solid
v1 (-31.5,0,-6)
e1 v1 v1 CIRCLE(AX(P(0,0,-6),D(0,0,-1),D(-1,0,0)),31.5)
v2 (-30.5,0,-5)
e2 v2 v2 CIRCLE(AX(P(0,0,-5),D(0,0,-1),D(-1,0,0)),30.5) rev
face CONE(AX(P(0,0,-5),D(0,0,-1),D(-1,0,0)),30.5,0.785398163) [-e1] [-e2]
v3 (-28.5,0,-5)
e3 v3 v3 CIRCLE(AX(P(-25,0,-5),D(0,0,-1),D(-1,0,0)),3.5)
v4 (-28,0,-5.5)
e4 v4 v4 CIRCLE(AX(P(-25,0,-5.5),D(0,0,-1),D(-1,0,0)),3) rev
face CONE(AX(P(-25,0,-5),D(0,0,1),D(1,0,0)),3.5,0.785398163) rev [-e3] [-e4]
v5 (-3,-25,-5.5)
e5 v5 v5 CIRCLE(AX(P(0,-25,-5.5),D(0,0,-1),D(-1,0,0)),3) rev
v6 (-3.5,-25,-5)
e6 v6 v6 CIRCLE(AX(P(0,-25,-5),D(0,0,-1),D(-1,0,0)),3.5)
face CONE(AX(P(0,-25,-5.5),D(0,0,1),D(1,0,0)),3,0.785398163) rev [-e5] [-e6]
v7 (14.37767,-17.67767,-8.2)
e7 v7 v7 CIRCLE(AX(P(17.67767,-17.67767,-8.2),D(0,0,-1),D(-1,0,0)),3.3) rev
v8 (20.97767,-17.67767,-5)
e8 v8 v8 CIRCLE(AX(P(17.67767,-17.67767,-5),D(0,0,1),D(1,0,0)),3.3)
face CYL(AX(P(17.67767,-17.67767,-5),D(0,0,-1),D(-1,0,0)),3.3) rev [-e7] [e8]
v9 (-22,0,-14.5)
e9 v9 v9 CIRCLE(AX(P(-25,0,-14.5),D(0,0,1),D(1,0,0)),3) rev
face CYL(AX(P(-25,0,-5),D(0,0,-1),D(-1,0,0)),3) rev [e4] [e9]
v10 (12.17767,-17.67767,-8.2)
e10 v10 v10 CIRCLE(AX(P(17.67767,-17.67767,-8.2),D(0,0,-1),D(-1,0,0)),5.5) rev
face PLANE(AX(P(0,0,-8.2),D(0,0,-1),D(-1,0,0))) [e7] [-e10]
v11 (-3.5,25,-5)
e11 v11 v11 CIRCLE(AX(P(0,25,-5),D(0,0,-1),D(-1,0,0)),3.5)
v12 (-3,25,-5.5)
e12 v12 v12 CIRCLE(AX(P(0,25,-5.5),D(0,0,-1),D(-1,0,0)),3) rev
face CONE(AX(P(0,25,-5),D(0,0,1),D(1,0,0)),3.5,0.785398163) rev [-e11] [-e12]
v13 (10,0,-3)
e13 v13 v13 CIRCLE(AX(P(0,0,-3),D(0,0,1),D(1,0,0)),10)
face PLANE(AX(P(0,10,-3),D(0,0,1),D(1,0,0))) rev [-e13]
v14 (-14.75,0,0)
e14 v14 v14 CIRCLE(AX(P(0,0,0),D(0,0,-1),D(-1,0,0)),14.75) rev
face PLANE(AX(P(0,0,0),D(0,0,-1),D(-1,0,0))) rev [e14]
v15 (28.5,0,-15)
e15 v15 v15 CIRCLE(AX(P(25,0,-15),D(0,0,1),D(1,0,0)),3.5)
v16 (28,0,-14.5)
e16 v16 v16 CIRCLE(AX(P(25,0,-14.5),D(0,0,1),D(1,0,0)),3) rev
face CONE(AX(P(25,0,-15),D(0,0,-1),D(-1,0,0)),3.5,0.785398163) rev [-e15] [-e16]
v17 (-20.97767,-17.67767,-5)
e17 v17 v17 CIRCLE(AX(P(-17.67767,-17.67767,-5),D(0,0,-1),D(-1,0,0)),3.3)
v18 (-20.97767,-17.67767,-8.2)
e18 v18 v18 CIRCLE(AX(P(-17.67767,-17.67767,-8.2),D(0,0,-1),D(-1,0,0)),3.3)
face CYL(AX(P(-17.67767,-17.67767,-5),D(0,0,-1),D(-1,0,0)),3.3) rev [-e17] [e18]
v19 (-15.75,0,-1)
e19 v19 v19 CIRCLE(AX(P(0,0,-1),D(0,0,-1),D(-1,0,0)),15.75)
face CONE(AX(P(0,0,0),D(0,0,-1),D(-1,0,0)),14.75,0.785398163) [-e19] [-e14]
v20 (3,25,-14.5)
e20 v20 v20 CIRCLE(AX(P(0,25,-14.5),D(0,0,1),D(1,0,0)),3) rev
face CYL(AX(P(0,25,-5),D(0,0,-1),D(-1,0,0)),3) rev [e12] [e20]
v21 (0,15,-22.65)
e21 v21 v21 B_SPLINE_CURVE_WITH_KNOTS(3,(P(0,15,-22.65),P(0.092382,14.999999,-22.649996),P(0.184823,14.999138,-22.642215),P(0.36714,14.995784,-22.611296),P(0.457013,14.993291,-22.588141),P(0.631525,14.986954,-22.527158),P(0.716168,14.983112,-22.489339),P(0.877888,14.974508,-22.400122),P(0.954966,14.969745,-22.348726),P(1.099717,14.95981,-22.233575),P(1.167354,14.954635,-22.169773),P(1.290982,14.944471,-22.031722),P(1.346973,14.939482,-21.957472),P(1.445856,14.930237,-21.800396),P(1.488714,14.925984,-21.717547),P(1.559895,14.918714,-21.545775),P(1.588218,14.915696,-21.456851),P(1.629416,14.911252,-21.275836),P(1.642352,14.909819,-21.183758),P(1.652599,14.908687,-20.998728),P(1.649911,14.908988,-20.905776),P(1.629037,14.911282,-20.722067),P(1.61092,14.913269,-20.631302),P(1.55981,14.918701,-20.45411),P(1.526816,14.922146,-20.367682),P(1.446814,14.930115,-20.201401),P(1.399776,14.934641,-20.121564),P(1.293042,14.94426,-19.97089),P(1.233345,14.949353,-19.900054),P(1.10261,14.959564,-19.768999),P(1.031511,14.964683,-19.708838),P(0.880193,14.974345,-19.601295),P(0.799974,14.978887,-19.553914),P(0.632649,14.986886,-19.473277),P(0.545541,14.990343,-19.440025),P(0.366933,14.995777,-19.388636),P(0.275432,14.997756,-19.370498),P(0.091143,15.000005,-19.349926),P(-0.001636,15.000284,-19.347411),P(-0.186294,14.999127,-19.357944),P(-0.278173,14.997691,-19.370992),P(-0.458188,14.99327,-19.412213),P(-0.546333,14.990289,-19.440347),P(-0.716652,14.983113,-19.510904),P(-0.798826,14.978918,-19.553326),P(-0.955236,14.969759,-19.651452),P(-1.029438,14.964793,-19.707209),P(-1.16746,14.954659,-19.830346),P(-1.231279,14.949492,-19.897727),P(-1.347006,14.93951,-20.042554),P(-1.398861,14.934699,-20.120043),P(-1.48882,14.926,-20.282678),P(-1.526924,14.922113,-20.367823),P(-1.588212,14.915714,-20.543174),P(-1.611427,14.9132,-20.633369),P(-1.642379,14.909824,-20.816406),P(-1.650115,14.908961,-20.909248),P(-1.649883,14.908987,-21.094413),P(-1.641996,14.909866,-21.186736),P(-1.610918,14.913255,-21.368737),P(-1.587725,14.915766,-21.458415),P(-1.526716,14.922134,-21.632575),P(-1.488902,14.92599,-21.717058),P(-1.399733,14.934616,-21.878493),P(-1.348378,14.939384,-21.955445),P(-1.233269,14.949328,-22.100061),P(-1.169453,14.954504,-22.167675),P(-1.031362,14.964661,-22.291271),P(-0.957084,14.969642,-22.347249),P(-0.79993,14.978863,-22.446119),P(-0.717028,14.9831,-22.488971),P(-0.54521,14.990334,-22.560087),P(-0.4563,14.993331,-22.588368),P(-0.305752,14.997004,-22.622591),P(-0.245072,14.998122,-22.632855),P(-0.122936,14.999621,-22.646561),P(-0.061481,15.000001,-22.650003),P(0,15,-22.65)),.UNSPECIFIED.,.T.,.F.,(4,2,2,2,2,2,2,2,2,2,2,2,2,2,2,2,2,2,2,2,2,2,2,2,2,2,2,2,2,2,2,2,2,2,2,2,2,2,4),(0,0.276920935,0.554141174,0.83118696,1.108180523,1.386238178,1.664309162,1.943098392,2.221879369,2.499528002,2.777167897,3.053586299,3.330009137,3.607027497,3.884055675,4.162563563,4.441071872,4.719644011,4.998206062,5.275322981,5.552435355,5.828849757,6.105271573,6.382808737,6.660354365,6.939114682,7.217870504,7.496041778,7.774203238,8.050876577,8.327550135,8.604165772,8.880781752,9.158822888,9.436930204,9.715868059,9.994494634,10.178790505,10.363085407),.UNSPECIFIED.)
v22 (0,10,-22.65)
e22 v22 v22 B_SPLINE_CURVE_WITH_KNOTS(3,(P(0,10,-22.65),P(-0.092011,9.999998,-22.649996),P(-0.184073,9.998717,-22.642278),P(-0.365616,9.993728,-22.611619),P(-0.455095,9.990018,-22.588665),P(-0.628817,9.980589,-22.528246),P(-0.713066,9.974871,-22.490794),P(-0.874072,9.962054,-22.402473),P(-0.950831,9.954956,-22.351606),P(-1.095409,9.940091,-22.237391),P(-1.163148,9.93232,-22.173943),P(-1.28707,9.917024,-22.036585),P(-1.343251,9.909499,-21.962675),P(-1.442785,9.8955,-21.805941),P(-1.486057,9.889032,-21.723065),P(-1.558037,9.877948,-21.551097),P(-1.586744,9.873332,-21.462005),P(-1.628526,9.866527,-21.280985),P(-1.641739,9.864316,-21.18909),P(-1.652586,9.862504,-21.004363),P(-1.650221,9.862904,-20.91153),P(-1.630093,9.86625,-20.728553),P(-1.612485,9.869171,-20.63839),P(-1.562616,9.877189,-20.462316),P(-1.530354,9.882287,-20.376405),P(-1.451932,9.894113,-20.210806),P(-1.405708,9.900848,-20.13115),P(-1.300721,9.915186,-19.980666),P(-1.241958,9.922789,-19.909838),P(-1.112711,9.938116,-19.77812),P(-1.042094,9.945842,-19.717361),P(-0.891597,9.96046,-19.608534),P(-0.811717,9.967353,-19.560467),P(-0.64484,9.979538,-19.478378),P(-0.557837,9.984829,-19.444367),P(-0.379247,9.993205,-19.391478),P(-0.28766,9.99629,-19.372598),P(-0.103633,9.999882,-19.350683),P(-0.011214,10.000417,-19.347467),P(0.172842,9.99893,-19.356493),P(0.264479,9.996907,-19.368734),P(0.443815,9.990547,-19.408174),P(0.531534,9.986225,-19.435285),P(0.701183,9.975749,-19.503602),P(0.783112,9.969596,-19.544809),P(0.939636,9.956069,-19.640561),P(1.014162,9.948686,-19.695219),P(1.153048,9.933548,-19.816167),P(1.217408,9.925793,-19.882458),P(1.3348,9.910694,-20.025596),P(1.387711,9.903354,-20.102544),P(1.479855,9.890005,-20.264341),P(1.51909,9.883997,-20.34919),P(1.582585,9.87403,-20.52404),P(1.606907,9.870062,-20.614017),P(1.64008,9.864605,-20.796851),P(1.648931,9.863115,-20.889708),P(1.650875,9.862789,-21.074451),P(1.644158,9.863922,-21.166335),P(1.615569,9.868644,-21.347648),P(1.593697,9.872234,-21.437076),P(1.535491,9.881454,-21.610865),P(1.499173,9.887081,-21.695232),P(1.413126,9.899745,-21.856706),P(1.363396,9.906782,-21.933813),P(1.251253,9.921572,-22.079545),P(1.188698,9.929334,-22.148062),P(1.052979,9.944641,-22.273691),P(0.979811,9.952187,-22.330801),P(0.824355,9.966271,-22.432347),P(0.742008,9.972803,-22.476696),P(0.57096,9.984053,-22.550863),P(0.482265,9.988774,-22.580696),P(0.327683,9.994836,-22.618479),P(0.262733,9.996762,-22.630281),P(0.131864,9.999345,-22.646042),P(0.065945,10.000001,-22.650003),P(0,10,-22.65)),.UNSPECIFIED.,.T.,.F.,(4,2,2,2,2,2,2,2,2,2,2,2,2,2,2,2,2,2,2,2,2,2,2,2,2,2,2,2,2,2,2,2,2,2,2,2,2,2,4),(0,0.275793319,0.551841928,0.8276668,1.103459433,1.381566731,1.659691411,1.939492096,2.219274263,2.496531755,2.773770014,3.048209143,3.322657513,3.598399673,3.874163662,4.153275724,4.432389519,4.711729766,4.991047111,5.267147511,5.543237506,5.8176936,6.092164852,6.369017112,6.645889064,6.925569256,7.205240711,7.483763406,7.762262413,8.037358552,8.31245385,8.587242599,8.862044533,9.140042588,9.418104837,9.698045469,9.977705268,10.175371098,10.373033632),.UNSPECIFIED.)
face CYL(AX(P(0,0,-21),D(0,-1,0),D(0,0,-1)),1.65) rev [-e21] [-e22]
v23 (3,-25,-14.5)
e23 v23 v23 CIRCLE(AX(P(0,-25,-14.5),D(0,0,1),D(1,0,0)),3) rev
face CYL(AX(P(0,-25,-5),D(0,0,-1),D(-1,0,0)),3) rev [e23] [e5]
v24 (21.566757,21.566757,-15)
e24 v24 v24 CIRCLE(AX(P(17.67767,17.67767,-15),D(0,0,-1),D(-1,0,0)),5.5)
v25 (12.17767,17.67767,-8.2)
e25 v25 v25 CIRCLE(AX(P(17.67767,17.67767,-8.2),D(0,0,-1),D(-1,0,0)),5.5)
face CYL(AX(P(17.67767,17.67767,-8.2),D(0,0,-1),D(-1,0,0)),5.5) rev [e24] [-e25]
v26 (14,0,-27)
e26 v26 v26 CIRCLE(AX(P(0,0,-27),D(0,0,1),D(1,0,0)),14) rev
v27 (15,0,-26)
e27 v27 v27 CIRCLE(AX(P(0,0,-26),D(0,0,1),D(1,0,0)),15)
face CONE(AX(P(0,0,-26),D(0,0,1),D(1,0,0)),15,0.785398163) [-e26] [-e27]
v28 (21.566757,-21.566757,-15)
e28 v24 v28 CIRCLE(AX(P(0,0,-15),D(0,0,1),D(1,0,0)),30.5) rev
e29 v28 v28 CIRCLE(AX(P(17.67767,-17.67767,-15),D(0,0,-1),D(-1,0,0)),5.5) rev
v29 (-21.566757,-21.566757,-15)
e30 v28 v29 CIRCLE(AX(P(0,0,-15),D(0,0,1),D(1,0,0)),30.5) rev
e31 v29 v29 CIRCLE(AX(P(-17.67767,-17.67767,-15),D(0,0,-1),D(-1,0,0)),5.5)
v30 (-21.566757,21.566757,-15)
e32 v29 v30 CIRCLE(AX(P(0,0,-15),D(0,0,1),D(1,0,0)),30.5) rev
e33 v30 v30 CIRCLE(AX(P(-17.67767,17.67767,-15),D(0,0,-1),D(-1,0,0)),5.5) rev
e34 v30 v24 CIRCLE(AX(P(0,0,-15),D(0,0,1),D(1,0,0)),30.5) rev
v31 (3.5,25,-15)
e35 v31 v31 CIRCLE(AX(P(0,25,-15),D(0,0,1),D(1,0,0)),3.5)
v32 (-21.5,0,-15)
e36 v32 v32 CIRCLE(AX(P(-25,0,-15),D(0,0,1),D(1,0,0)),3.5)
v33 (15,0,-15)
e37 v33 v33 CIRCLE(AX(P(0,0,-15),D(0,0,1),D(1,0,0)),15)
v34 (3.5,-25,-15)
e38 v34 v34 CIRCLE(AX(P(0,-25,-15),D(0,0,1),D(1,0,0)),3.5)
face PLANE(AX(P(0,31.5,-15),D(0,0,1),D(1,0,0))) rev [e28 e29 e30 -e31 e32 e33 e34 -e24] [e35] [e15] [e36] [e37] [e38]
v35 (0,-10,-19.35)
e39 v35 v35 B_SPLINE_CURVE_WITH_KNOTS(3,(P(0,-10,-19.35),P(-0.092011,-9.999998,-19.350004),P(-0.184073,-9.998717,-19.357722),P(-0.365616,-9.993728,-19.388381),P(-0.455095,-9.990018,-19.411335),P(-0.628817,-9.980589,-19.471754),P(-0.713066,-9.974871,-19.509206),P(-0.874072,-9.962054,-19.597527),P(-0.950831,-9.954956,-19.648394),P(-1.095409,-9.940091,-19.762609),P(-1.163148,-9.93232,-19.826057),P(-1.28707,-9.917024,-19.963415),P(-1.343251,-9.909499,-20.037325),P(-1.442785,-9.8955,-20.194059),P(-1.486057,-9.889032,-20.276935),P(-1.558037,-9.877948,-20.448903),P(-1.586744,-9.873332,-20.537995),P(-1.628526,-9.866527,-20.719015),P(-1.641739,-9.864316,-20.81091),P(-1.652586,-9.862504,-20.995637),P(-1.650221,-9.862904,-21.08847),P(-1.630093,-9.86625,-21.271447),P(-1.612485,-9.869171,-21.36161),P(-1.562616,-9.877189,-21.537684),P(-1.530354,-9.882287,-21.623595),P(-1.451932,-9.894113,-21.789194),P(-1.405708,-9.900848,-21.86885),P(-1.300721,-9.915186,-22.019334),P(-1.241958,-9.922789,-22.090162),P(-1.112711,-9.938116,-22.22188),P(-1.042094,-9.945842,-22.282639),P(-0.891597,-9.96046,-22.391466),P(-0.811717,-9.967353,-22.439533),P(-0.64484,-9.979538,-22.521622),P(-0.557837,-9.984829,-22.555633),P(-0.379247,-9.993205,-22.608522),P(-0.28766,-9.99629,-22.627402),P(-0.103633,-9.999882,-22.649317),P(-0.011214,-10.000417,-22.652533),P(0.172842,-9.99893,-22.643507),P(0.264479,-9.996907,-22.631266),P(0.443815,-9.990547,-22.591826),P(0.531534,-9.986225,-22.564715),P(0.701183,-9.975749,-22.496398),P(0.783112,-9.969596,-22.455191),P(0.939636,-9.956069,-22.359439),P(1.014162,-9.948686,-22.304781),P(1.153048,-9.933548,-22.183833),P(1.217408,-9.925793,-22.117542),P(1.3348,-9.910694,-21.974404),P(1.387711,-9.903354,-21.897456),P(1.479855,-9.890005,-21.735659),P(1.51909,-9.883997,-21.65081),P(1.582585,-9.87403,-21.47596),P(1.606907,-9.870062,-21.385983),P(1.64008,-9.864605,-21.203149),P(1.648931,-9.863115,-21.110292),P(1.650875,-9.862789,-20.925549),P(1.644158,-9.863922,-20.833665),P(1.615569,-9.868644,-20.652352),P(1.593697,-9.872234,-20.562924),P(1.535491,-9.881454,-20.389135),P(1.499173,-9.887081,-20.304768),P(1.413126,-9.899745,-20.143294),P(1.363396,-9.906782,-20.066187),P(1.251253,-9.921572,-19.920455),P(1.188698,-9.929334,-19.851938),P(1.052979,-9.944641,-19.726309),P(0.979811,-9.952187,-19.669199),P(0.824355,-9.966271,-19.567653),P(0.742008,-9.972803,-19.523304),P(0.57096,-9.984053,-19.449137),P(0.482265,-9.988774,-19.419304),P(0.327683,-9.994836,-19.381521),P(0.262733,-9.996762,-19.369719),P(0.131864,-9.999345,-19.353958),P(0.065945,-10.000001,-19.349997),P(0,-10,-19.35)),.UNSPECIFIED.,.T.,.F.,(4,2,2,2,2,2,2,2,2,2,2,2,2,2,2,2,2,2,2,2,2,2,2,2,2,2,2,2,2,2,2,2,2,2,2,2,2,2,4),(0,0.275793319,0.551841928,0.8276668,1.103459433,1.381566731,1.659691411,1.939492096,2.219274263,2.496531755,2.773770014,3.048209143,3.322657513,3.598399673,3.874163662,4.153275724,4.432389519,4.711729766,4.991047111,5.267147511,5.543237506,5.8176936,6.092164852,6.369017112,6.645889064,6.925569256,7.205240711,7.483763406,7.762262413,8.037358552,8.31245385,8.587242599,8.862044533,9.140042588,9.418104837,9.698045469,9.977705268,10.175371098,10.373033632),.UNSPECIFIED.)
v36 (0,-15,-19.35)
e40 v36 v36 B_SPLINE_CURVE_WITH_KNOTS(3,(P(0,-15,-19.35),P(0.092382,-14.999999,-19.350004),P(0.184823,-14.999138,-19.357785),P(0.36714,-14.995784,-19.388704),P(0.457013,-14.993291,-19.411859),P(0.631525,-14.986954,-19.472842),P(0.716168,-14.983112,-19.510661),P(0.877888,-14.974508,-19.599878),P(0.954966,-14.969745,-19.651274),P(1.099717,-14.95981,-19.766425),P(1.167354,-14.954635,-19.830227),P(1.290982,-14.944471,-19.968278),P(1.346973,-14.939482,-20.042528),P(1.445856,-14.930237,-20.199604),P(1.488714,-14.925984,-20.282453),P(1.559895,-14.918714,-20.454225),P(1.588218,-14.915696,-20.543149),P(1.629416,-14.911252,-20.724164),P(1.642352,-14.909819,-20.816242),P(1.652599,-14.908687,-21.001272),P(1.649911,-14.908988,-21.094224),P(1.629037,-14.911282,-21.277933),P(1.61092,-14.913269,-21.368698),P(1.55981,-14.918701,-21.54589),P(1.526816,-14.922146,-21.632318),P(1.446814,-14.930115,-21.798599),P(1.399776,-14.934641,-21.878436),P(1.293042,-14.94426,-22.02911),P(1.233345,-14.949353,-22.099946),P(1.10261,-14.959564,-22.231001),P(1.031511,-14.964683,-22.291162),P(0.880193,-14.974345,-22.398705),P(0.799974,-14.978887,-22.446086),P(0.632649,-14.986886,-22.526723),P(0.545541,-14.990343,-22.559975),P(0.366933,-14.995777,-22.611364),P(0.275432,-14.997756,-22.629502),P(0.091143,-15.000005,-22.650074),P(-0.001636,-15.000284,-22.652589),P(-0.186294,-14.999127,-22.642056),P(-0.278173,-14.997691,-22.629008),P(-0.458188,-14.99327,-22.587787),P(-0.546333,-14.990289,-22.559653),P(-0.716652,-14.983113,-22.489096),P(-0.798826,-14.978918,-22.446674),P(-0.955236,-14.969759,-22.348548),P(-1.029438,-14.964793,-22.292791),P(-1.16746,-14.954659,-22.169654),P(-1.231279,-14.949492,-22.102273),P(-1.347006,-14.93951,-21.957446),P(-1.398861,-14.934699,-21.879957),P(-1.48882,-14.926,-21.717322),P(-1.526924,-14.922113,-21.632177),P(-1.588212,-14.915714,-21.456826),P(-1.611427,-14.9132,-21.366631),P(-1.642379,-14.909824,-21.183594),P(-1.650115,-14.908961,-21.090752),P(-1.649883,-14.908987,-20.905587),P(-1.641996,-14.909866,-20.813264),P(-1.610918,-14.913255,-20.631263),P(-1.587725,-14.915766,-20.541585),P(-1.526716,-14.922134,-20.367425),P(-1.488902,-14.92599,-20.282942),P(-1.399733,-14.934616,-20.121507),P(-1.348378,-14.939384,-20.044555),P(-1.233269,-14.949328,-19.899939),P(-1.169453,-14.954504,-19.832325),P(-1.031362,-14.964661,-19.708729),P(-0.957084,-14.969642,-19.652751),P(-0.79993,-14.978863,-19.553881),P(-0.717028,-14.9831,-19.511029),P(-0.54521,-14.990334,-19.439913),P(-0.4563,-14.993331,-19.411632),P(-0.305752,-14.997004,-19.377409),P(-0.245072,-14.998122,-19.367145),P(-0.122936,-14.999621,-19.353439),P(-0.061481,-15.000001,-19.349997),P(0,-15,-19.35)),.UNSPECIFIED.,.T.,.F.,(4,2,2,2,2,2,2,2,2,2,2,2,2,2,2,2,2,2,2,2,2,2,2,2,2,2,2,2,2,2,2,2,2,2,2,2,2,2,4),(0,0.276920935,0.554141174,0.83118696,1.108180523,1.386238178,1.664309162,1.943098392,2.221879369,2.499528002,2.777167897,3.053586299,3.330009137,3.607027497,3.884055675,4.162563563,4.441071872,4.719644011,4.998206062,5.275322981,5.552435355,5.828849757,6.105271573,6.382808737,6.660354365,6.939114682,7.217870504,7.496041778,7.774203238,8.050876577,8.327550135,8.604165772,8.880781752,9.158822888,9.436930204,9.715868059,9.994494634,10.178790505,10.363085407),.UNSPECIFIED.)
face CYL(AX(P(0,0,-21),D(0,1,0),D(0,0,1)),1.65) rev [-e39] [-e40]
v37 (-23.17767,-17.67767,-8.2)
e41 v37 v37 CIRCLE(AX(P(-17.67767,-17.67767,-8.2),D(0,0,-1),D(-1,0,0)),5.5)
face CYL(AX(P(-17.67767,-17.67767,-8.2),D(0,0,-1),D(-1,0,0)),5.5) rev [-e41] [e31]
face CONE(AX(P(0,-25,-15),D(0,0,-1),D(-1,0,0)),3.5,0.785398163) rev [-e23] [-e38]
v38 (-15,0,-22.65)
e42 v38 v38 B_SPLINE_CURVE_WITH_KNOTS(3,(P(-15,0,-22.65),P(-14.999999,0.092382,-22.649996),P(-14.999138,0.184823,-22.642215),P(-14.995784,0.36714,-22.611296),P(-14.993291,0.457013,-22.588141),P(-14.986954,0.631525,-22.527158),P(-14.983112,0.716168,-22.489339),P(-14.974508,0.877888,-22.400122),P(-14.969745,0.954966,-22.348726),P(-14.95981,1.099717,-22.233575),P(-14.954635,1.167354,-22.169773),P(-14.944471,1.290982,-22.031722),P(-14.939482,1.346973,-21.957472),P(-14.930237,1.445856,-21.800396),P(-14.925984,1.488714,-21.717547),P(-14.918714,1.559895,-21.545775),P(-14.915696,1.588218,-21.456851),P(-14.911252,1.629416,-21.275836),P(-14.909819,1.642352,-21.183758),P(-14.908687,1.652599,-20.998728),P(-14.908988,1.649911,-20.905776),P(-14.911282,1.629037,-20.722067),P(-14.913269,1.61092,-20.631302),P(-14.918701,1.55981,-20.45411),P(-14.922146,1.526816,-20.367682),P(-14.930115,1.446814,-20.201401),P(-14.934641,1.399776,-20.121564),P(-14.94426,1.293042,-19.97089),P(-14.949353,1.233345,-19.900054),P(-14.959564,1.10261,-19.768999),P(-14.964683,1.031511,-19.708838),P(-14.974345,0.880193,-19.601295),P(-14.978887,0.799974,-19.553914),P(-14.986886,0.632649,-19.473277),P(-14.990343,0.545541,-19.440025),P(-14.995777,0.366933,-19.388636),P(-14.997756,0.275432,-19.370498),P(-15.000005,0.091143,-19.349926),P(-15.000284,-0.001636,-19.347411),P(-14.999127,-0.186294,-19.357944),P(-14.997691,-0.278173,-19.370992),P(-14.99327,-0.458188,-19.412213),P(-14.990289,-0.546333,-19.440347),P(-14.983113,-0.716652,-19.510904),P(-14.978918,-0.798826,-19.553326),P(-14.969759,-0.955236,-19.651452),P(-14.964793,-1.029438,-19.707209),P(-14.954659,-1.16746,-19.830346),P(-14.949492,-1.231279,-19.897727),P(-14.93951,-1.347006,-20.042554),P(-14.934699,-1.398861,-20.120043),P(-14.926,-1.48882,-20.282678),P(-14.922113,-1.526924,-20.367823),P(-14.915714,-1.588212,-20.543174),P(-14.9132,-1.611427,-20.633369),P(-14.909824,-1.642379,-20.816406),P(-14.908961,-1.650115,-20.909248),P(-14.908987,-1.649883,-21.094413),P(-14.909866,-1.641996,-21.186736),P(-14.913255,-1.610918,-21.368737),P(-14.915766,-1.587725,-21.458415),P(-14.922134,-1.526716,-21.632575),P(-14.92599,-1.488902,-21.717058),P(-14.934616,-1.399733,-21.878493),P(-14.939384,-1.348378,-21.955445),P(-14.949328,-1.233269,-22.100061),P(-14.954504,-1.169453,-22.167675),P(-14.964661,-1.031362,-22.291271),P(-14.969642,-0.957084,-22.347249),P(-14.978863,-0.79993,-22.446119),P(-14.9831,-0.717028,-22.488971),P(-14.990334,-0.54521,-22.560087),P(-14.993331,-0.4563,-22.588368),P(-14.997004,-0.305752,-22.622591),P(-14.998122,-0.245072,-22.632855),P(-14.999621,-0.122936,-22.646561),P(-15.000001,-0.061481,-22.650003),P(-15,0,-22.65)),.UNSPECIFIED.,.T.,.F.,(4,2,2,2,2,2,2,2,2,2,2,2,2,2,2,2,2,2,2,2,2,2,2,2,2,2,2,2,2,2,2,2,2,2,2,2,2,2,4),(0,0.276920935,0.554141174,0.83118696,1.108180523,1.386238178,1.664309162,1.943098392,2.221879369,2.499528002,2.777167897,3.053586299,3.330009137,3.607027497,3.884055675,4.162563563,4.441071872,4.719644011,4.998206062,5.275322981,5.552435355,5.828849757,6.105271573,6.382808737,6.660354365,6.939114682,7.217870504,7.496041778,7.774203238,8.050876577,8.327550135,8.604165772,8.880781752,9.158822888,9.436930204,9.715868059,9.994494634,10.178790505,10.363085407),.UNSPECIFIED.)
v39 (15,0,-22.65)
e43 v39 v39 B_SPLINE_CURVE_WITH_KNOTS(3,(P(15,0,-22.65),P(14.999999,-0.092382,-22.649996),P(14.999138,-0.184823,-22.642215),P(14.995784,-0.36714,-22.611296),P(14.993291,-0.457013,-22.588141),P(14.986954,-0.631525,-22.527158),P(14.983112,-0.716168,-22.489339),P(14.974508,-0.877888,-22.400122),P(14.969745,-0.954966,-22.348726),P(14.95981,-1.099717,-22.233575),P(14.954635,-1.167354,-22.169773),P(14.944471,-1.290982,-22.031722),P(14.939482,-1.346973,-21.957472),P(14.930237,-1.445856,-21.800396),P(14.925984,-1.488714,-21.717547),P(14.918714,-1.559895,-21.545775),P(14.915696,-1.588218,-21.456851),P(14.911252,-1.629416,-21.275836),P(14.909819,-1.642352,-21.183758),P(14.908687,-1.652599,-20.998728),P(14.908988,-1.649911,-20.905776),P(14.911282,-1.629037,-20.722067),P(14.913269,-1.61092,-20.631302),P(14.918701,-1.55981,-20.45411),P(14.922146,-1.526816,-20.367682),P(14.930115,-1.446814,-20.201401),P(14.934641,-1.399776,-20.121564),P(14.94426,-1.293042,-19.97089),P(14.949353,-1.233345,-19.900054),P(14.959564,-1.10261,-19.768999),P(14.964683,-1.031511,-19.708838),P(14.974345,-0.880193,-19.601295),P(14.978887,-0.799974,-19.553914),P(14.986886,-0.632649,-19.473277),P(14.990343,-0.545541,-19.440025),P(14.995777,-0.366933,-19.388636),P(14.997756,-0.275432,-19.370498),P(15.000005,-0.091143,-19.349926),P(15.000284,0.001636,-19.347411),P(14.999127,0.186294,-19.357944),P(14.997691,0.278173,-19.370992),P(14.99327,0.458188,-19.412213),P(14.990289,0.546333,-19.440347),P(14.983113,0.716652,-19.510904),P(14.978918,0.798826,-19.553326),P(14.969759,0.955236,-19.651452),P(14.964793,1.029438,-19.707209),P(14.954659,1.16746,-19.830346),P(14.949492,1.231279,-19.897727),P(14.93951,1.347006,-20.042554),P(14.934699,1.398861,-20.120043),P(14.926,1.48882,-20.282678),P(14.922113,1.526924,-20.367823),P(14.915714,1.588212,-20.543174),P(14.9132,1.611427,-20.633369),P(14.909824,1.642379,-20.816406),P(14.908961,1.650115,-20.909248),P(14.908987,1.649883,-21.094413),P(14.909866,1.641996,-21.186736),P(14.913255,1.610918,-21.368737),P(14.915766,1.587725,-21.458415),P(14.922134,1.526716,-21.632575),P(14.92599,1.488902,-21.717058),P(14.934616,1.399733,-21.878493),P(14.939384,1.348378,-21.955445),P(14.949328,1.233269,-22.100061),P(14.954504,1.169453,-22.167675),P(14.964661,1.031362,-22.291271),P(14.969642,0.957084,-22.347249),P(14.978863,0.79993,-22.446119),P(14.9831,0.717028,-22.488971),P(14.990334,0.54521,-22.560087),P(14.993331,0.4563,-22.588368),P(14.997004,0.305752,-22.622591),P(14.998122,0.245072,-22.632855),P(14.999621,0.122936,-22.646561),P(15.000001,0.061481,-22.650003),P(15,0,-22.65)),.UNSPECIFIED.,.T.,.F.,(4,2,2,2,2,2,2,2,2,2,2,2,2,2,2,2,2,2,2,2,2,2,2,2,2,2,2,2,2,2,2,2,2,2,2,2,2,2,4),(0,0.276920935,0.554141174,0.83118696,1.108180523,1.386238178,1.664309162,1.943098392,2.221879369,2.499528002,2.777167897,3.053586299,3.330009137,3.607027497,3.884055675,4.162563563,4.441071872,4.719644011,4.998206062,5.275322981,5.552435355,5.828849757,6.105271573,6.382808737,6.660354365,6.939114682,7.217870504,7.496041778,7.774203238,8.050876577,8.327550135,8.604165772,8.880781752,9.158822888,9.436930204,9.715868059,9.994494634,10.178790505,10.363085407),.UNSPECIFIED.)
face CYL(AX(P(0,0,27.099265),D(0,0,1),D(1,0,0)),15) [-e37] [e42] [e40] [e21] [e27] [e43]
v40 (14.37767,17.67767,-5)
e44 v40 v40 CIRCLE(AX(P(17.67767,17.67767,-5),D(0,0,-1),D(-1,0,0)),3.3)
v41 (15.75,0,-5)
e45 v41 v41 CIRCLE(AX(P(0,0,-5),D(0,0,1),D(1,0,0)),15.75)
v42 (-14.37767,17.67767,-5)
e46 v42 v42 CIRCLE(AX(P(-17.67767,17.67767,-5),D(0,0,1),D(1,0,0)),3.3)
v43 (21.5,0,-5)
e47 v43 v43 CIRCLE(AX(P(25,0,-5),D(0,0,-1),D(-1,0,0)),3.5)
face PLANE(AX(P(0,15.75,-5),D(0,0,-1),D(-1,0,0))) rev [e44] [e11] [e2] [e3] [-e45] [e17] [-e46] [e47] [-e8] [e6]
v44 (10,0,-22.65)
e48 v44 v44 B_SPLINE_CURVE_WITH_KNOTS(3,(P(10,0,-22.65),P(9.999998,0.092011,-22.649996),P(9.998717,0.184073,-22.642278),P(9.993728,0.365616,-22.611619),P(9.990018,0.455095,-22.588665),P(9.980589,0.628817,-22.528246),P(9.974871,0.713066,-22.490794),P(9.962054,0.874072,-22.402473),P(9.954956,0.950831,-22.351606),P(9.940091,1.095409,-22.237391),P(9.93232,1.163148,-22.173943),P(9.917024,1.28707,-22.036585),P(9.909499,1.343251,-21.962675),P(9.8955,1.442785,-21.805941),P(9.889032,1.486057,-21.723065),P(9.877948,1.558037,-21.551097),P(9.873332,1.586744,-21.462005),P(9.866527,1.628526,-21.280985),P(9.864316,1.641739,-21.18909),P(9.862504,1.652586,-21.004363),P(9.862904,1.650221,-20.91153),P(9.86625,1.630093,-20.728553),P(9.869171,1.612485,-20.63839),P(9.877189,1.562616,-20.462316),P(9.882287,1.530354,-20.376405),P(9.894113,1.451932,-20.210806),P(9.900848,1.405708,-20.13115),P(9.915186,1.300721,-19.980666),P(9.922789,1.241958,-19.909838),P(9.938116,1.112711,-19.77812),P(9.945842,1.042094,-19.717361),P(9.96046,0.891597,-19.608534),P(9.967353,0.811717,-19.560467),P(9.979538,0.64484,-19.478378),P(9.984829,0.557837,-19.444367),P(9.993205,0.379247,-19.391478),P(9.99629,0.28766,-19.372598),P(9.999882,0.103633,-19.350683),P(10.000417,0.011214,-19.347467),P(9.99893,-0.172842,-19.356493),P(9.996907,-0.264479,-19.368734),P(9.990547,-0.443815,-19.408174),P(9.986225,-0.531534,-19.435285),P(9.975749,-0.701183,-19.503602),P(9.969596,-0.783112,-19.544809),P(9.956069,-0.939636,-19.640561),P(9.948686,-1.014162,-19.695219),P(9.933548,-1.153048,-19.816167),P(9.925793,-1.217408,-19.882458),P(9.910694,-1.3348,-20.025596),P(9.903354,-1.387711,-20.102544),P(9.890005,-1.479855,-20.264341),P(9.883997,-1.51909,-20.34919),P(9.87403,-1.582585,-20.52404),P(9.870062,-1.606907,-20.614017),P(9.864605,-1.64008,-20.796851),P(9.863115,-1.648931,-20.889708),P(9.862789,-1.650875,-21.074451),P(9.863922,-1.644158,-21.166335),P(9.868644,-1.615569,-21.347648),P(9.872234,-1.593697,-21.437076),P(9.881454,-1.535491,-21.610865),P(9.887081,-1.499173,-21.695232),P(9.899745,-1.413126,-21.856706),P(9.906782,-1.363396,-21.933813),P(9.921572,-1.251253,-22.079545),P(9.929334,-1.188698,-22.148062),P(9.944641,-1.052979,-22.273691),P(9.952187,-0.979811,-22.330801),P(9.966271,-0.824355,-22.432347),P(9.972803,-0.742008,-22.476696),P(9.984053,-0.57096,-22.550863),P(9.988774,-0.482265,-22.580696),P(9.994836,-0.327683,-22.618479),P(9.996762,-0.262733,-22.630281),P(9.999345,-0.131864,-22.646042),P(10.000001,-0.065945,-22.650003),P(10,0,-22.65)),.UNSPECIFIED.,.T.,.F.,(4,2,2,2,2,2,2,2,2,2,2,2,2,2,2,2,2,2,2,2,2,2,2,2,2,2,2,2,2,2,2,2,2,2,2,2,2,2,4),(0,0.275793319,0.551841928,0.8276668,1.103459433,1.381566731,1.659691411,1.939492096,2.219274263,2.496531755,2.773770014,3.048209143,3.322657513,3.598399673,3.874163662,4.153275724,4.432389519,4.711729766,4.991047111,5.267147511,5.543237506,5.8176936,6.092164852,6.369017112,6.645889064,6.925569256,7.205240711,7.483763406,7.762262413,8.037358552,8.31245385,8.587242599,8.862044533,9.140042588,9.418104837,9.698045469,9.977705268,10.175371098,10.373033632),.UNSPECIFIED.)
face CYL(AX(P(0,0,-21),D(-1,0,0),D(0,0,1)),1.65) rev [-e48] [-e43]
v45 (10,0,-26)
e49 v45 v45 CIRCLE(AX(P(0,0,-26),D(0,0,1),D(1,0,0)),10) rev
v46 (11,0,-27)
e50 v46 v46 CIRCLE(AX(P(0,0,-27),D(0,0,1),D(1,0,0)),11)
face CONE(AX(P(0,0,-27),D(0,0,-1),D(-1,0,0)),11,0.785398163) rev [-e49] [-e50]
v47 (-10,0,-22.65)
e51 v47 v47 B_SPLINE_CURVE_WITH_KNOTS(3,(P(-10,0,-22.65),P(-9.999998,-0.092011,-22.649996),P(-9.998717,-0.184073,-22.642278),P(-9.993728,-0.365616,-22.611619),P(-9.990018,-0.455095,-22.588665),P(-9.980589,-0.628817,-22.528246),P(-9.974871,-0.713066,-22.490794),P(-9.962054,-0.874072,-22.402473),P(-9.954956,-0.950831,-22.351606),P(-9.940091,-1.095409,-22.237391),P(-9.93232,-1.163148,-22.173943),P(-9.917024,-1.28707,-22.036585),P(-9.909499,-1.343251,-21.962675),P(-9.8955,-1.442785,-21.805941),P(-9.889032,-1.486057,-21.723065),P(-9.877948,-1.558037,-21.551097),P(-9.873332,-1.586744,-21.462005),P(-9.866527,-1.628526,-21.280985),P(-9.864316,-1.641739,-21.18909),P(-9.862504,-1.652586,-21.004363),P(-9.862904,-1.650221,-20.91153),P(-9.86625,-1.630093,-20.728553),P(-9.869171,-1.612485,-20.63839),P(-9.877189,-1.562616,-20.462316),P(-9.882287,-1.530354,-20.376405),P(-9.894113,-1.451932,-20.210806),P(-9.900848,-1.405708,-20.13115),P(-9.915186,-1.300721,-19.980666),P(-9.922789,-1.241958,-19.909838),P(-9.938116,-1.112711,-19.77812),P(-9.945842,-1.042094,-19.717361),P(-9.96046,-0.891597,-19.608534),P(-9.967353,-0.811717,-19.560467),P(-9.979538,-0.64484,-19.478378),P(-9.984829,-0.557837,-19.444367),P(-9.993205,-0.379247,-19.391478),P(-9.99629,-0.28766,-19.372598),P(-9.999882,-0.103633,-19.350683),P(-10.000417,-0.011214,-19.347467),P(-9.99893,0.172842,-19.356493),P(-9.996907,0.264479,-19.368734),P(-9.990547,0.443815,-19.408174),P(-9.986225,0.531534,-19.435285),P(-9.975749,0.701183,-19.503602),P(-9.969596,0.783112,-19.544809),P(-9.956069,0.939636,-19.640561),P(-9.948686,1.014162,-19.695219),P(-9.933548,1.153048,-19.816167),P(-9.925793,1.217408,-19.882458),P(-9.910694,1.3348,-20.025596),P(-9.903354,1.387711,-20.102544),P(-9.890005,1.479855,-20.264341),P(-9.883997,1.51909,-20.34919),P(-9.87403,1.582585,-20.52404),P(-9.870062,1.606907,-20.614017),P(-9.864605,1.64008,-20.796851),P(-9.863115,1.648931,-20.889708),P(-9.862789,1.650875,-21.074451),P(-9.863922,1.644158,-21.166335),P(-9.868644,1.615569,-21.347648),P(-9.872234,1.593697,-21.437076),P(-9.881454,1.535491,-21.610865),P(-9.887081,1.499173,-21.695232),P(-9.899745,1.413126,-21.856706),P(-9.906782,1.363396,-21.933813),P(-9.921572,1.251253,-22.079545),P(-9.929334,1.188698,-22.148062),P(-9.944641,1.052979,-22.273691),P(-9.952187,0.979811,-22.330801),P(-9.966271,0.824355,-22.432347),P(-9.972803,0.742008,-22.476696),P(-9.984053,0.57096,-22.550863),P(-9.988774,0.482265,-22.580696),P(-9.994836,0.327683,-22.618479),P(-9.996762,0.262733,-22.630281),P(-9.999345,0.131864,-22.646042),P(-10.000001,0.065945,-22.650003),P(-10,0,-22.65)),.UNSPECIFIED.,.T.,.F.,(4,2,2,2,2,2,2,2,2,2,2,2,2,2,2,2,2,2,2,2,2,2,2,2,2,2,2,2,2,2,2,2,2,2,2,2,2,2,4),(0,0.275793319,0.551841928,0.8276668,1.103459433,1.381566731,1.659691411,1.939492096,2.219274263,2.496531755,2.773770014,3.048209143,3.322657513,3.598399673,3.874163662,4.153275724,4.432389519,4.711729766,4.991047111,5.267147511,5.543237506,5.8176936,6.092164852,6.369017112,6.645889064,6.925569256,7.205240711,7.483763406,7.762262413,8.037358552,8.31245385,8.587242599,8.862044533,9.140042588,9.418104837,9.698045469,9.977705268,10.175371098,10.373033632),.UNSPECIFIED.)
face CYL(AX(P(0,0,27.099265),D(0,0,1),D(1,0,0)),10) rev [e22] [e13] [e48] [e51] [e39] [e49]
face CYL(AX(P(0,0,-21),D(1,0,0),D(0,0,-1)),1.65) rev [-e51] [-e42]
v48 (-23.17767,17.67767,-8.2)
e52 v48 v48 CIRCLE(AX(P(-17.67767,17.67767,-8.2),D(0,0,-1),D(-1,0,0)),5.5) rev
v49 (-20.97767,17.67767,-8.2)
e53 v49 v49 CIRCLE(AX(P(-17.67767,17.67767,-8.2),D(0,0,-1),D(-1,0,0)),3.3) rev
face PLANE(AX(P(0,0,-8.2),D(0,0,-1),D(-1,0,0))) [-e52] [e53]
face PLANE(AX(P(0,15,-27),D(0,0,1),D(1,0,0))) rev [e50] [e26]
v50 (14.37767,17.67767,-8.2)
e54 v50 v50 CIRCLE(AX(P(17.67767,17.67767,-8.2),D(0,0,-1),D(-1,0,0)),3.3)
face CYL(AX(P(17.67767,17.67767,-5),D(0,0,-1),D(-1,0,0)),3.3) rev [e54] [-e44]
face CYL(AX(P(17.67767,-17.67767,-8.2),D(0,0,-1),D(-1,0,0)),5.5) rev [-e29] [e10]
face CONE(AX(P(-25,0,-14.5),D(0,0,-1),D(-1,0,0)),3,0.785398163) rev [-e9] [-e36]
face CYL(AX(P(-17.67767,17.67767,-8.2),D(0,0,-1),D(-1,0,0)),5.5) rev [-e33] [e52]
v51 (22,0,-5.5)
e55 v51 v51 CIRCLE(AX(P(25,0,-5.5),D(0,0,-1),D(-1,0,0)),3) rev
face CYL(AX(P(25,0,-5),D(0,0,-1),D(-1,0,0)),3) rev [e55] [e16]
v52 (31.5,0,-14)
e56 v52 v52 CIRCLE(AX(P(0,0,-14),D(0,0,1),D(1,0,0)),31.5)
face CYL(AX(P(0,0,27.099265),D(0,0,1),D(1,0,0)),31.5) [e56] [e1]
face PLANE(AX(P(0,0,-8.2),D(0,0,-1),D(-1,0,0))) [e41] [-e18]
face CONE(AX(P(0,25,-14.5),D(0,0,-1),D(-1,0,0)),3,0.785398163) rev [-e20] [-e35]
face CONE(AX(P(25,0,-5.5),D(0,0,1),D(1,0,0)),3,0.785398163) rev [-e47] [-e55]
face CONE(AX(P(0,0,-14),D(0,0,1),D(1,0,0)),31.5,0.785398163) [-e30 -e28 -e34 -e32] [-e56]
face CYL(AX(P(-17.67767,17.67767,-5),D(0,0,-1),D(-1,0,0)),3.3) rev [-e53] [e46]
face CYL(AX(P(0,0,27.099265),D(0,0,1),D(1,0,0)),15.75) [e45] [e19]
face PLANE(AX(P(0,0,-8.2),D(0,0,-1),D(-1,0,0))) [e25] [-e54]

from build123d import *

# Parameters (mm, degrees)
SKETCH_2_R               = 3.3
SKETCH_2_R_2             = 3
CUT_EXTRUDE_1_DEPTH      = 10
SKETCH_2_3_R             = 5.5
SKETCH_2_3_R_2           = 3.3
CUT_EXTRUDE_2_DEPTH      = 6.8
CHAMFER_1_SIZE           = 1
CHAMFER_2_SIZE           = 1
CHAMFER_3_SIZE           = 1
SKETCH_5_W               = 1.65
SKETCH_5_H               = 31.5
PATTERN_CIRCULAR_1_COUNT = 4
CHAMFER_4_SIZE           = 0.5
CHAMFER_5_SIZE           = 1


with BuildPart() as part:
    # 草图1 → 旋转1 (revolve)
    with BuildSketch(Plane(origin=(0, 0, 0), x_dir=(0, 0, -1), z_dir=(1, 0, 0)), mode=Mode.PRIVATE) as revolve_1_sk:
        Polygon((0, 0), (0, 15.75), (5, 15.75), (5, 31.5), (15, 31.5), (15, 15), (27, 15), (27, 10), (3, 10), (3, 0), align=None)
    revolve(revolve_1_sk.sketch.rotate(Axis((0, 0, 27.099264706), (0, 0, -1)), 90), axis=Axis((0, 0, 27.099264706), (0, 0, -1)))

    # 草图2 → 切除-拉伸1 (cut)
    with BuildSketch(Plane(origin=(0, 0, -15), x_dir=(-1, 0, 0), z_dir=(0, 0, -1))):
        with Locations((-17.67766953, 17.67766953)):
            Circle(SKETCH_2_R)
        with Locations((0, 25)):
            Circle(SKETCH_2_R_2)
        with Locations(Location((17.67766953, 17.67766953, 0), (0, 0, 180))):
            Circle(SKETCH_2_R)
        with Locations((17.67766953, -17.67766953)):
            Circle(SKETCH_2_R)
        with Locations(Location((-17.67766953, -17.67766953, 0), (0, 0, 180))):
            Circle(SKETCH_2_R)
        with Locations(Location((0, -25, 0), (0, 0, 180))):
            Circle(SKETCH_2_R_2)
        with Locations(Location((-25, 0, 0), (0, 0, 180))):
            Circle(SKETCH_2_R_2)
        with Locations((25, 0)):
            Circle(SKETCH_2_R_2)
    extrude(amount=-CUT_EXTRUDE_1_DEPTH, mode=Mode.SUBTRACT)

    # 草图2<3> → 切除-拉伸2 (cut)
    # profile 1 of 4: a face of its own
    with BuildSketch(Plane(origin=(0, 0, -15), x_dir=(-1, 0, 0), z_dir=(0, 0, -1))):
        with Locations((-17.67766953, 17.67766953)):
            Circle(SKETCH_2_3_R)
        with Locations((-17.67766953, 17.67766953)):
            Circle(SKETCH_2_3_R_2, mode=Mode.SUBTRACT)
    # profile 2 of 4: a face of its own
    with BuildSketch(Plane(origin=(0, 0, -15), x_dir=(-1, 0, 0), z_dir=(0, 0, -1))):
        with Locations((17.67766953, 17.67766953)):
            Circle(SKETCH_2_3_R)
        with Locations((17.67766953, 17.67766953)):
            Circle(SKETCH_2_3_R_2, mode=Mode.SUBTRACT)
    # profile 3 of 4: a face of its own
    with BuildSketch(Plane(origin=(0, 0, -15), x_dir=(-1, 0, 0), z_dir=(0, 0, -1))):
        with Locations((17.67766953, -17.67766953)):
            Circle(SKETCH_2_3_R)
        with Locations((17.67766953, -17.67766953)):
            Circle(SKETCH_2_3_R_2, mode=Mode.SUBTRACT)
    # profile 4 of 4: a face of its own
    with BuildSketch(Plane(origin=(0, 0, -15), x_dir=(-1, 0, 0), z_dir=(0, 0, -1))):
        with Locations((-17.67766953, -17.67766953)):
            Circle(SKETCH_2_3_R)
        with Locations((-17.67766953, -17.67766953)):
            Circle(SKETCH_2_3_R_2, mode=Mode.SUBTRACT)
    extrude(amount=-CUT_EXTRUDE_2_DEPTH, mode=Mode.SUBTRACT)

    # 倒角1
    chamfer_1_edges = [part.edges().sort_by_distance(p)[0] for p in [
        (-15.75, 0, 0),
    ]]
    chamfer(chamfer_1_edges, length=CHAMFER_1_SIZE)

    # 倒角2
    chamfer_2_edges = [part.edges().sort_by_distance(p)[0] for p in [
        (-10, 0, -27),
    ]]
    chamfer(chamfer_2_edges, length=CHAMFER_2_SIZE)

    # 倒角3
    chamfer_3_edges = [part.edges().sort_by_distance(p)[0] for p in [
        (-31.5, 0, -15),
        (-31.5, 0, -5),
    ]]
    chamfer(chamfer_3_edges, length=CHAMFER_3_SIZE - 0.0001)  # a hair under: the kernel refuses the full size

    # 草图5 → M4 螺纹孔1 (revolve, cut)
    with BuildSketch(Plane(origin=(0, 0, -21), x_dir=(0, 0, -1), z_dir=(1, 0, 0))):
        with Locations((0.825, 15.75)):
            Rectangle(SKETCH_5_W, SKETCH_5_H)
    hole_wizard_m4_1 = revolve(axis=Axis((0, -6.35, -21), (0, 1, 0)), mode=Mode.SUBTRACT)

    # 阵列(圆周)1: M4 螺纹孔1 ×4 about axis
    pattern_circular_1_axis = Axis((0, 0, -27), (0, 0, 1))
    for i in range(1, PATTERN_CIRCULAR_1_COUNT):
        add(hole_wizard_m4_1.rotate(pattern_circular_1_axis, i * 360 / PATTERN_CIRCULAR_1_COUNT), mode=Mode.SUBTRACT)

    # 倒角4
    chamfer_4_edges = [part.edges().sort_by_distance(p)[0] for p in [
        (22, 0, -15),
        (22, 0, -5),
        (3, 25, -5),
        (3, 25, -15),
        (-22, 0, -5),
        (-22, 0, -15),
        (-3, -25, -15),
        (-3, -25, -5),
    ]]
    chamfer(chamfer_4_edges, length=CHAMFER_4_SIZE)

    # 倒角5
    chamfer_5_edges = [part.edges().sort_by_distance(p)[0] for p in [
        (-15, 0, -27),
    ]]
    chamfer(chamfer_5_edges, length=CHAMFER_5_SIZE)


solid = part.part
